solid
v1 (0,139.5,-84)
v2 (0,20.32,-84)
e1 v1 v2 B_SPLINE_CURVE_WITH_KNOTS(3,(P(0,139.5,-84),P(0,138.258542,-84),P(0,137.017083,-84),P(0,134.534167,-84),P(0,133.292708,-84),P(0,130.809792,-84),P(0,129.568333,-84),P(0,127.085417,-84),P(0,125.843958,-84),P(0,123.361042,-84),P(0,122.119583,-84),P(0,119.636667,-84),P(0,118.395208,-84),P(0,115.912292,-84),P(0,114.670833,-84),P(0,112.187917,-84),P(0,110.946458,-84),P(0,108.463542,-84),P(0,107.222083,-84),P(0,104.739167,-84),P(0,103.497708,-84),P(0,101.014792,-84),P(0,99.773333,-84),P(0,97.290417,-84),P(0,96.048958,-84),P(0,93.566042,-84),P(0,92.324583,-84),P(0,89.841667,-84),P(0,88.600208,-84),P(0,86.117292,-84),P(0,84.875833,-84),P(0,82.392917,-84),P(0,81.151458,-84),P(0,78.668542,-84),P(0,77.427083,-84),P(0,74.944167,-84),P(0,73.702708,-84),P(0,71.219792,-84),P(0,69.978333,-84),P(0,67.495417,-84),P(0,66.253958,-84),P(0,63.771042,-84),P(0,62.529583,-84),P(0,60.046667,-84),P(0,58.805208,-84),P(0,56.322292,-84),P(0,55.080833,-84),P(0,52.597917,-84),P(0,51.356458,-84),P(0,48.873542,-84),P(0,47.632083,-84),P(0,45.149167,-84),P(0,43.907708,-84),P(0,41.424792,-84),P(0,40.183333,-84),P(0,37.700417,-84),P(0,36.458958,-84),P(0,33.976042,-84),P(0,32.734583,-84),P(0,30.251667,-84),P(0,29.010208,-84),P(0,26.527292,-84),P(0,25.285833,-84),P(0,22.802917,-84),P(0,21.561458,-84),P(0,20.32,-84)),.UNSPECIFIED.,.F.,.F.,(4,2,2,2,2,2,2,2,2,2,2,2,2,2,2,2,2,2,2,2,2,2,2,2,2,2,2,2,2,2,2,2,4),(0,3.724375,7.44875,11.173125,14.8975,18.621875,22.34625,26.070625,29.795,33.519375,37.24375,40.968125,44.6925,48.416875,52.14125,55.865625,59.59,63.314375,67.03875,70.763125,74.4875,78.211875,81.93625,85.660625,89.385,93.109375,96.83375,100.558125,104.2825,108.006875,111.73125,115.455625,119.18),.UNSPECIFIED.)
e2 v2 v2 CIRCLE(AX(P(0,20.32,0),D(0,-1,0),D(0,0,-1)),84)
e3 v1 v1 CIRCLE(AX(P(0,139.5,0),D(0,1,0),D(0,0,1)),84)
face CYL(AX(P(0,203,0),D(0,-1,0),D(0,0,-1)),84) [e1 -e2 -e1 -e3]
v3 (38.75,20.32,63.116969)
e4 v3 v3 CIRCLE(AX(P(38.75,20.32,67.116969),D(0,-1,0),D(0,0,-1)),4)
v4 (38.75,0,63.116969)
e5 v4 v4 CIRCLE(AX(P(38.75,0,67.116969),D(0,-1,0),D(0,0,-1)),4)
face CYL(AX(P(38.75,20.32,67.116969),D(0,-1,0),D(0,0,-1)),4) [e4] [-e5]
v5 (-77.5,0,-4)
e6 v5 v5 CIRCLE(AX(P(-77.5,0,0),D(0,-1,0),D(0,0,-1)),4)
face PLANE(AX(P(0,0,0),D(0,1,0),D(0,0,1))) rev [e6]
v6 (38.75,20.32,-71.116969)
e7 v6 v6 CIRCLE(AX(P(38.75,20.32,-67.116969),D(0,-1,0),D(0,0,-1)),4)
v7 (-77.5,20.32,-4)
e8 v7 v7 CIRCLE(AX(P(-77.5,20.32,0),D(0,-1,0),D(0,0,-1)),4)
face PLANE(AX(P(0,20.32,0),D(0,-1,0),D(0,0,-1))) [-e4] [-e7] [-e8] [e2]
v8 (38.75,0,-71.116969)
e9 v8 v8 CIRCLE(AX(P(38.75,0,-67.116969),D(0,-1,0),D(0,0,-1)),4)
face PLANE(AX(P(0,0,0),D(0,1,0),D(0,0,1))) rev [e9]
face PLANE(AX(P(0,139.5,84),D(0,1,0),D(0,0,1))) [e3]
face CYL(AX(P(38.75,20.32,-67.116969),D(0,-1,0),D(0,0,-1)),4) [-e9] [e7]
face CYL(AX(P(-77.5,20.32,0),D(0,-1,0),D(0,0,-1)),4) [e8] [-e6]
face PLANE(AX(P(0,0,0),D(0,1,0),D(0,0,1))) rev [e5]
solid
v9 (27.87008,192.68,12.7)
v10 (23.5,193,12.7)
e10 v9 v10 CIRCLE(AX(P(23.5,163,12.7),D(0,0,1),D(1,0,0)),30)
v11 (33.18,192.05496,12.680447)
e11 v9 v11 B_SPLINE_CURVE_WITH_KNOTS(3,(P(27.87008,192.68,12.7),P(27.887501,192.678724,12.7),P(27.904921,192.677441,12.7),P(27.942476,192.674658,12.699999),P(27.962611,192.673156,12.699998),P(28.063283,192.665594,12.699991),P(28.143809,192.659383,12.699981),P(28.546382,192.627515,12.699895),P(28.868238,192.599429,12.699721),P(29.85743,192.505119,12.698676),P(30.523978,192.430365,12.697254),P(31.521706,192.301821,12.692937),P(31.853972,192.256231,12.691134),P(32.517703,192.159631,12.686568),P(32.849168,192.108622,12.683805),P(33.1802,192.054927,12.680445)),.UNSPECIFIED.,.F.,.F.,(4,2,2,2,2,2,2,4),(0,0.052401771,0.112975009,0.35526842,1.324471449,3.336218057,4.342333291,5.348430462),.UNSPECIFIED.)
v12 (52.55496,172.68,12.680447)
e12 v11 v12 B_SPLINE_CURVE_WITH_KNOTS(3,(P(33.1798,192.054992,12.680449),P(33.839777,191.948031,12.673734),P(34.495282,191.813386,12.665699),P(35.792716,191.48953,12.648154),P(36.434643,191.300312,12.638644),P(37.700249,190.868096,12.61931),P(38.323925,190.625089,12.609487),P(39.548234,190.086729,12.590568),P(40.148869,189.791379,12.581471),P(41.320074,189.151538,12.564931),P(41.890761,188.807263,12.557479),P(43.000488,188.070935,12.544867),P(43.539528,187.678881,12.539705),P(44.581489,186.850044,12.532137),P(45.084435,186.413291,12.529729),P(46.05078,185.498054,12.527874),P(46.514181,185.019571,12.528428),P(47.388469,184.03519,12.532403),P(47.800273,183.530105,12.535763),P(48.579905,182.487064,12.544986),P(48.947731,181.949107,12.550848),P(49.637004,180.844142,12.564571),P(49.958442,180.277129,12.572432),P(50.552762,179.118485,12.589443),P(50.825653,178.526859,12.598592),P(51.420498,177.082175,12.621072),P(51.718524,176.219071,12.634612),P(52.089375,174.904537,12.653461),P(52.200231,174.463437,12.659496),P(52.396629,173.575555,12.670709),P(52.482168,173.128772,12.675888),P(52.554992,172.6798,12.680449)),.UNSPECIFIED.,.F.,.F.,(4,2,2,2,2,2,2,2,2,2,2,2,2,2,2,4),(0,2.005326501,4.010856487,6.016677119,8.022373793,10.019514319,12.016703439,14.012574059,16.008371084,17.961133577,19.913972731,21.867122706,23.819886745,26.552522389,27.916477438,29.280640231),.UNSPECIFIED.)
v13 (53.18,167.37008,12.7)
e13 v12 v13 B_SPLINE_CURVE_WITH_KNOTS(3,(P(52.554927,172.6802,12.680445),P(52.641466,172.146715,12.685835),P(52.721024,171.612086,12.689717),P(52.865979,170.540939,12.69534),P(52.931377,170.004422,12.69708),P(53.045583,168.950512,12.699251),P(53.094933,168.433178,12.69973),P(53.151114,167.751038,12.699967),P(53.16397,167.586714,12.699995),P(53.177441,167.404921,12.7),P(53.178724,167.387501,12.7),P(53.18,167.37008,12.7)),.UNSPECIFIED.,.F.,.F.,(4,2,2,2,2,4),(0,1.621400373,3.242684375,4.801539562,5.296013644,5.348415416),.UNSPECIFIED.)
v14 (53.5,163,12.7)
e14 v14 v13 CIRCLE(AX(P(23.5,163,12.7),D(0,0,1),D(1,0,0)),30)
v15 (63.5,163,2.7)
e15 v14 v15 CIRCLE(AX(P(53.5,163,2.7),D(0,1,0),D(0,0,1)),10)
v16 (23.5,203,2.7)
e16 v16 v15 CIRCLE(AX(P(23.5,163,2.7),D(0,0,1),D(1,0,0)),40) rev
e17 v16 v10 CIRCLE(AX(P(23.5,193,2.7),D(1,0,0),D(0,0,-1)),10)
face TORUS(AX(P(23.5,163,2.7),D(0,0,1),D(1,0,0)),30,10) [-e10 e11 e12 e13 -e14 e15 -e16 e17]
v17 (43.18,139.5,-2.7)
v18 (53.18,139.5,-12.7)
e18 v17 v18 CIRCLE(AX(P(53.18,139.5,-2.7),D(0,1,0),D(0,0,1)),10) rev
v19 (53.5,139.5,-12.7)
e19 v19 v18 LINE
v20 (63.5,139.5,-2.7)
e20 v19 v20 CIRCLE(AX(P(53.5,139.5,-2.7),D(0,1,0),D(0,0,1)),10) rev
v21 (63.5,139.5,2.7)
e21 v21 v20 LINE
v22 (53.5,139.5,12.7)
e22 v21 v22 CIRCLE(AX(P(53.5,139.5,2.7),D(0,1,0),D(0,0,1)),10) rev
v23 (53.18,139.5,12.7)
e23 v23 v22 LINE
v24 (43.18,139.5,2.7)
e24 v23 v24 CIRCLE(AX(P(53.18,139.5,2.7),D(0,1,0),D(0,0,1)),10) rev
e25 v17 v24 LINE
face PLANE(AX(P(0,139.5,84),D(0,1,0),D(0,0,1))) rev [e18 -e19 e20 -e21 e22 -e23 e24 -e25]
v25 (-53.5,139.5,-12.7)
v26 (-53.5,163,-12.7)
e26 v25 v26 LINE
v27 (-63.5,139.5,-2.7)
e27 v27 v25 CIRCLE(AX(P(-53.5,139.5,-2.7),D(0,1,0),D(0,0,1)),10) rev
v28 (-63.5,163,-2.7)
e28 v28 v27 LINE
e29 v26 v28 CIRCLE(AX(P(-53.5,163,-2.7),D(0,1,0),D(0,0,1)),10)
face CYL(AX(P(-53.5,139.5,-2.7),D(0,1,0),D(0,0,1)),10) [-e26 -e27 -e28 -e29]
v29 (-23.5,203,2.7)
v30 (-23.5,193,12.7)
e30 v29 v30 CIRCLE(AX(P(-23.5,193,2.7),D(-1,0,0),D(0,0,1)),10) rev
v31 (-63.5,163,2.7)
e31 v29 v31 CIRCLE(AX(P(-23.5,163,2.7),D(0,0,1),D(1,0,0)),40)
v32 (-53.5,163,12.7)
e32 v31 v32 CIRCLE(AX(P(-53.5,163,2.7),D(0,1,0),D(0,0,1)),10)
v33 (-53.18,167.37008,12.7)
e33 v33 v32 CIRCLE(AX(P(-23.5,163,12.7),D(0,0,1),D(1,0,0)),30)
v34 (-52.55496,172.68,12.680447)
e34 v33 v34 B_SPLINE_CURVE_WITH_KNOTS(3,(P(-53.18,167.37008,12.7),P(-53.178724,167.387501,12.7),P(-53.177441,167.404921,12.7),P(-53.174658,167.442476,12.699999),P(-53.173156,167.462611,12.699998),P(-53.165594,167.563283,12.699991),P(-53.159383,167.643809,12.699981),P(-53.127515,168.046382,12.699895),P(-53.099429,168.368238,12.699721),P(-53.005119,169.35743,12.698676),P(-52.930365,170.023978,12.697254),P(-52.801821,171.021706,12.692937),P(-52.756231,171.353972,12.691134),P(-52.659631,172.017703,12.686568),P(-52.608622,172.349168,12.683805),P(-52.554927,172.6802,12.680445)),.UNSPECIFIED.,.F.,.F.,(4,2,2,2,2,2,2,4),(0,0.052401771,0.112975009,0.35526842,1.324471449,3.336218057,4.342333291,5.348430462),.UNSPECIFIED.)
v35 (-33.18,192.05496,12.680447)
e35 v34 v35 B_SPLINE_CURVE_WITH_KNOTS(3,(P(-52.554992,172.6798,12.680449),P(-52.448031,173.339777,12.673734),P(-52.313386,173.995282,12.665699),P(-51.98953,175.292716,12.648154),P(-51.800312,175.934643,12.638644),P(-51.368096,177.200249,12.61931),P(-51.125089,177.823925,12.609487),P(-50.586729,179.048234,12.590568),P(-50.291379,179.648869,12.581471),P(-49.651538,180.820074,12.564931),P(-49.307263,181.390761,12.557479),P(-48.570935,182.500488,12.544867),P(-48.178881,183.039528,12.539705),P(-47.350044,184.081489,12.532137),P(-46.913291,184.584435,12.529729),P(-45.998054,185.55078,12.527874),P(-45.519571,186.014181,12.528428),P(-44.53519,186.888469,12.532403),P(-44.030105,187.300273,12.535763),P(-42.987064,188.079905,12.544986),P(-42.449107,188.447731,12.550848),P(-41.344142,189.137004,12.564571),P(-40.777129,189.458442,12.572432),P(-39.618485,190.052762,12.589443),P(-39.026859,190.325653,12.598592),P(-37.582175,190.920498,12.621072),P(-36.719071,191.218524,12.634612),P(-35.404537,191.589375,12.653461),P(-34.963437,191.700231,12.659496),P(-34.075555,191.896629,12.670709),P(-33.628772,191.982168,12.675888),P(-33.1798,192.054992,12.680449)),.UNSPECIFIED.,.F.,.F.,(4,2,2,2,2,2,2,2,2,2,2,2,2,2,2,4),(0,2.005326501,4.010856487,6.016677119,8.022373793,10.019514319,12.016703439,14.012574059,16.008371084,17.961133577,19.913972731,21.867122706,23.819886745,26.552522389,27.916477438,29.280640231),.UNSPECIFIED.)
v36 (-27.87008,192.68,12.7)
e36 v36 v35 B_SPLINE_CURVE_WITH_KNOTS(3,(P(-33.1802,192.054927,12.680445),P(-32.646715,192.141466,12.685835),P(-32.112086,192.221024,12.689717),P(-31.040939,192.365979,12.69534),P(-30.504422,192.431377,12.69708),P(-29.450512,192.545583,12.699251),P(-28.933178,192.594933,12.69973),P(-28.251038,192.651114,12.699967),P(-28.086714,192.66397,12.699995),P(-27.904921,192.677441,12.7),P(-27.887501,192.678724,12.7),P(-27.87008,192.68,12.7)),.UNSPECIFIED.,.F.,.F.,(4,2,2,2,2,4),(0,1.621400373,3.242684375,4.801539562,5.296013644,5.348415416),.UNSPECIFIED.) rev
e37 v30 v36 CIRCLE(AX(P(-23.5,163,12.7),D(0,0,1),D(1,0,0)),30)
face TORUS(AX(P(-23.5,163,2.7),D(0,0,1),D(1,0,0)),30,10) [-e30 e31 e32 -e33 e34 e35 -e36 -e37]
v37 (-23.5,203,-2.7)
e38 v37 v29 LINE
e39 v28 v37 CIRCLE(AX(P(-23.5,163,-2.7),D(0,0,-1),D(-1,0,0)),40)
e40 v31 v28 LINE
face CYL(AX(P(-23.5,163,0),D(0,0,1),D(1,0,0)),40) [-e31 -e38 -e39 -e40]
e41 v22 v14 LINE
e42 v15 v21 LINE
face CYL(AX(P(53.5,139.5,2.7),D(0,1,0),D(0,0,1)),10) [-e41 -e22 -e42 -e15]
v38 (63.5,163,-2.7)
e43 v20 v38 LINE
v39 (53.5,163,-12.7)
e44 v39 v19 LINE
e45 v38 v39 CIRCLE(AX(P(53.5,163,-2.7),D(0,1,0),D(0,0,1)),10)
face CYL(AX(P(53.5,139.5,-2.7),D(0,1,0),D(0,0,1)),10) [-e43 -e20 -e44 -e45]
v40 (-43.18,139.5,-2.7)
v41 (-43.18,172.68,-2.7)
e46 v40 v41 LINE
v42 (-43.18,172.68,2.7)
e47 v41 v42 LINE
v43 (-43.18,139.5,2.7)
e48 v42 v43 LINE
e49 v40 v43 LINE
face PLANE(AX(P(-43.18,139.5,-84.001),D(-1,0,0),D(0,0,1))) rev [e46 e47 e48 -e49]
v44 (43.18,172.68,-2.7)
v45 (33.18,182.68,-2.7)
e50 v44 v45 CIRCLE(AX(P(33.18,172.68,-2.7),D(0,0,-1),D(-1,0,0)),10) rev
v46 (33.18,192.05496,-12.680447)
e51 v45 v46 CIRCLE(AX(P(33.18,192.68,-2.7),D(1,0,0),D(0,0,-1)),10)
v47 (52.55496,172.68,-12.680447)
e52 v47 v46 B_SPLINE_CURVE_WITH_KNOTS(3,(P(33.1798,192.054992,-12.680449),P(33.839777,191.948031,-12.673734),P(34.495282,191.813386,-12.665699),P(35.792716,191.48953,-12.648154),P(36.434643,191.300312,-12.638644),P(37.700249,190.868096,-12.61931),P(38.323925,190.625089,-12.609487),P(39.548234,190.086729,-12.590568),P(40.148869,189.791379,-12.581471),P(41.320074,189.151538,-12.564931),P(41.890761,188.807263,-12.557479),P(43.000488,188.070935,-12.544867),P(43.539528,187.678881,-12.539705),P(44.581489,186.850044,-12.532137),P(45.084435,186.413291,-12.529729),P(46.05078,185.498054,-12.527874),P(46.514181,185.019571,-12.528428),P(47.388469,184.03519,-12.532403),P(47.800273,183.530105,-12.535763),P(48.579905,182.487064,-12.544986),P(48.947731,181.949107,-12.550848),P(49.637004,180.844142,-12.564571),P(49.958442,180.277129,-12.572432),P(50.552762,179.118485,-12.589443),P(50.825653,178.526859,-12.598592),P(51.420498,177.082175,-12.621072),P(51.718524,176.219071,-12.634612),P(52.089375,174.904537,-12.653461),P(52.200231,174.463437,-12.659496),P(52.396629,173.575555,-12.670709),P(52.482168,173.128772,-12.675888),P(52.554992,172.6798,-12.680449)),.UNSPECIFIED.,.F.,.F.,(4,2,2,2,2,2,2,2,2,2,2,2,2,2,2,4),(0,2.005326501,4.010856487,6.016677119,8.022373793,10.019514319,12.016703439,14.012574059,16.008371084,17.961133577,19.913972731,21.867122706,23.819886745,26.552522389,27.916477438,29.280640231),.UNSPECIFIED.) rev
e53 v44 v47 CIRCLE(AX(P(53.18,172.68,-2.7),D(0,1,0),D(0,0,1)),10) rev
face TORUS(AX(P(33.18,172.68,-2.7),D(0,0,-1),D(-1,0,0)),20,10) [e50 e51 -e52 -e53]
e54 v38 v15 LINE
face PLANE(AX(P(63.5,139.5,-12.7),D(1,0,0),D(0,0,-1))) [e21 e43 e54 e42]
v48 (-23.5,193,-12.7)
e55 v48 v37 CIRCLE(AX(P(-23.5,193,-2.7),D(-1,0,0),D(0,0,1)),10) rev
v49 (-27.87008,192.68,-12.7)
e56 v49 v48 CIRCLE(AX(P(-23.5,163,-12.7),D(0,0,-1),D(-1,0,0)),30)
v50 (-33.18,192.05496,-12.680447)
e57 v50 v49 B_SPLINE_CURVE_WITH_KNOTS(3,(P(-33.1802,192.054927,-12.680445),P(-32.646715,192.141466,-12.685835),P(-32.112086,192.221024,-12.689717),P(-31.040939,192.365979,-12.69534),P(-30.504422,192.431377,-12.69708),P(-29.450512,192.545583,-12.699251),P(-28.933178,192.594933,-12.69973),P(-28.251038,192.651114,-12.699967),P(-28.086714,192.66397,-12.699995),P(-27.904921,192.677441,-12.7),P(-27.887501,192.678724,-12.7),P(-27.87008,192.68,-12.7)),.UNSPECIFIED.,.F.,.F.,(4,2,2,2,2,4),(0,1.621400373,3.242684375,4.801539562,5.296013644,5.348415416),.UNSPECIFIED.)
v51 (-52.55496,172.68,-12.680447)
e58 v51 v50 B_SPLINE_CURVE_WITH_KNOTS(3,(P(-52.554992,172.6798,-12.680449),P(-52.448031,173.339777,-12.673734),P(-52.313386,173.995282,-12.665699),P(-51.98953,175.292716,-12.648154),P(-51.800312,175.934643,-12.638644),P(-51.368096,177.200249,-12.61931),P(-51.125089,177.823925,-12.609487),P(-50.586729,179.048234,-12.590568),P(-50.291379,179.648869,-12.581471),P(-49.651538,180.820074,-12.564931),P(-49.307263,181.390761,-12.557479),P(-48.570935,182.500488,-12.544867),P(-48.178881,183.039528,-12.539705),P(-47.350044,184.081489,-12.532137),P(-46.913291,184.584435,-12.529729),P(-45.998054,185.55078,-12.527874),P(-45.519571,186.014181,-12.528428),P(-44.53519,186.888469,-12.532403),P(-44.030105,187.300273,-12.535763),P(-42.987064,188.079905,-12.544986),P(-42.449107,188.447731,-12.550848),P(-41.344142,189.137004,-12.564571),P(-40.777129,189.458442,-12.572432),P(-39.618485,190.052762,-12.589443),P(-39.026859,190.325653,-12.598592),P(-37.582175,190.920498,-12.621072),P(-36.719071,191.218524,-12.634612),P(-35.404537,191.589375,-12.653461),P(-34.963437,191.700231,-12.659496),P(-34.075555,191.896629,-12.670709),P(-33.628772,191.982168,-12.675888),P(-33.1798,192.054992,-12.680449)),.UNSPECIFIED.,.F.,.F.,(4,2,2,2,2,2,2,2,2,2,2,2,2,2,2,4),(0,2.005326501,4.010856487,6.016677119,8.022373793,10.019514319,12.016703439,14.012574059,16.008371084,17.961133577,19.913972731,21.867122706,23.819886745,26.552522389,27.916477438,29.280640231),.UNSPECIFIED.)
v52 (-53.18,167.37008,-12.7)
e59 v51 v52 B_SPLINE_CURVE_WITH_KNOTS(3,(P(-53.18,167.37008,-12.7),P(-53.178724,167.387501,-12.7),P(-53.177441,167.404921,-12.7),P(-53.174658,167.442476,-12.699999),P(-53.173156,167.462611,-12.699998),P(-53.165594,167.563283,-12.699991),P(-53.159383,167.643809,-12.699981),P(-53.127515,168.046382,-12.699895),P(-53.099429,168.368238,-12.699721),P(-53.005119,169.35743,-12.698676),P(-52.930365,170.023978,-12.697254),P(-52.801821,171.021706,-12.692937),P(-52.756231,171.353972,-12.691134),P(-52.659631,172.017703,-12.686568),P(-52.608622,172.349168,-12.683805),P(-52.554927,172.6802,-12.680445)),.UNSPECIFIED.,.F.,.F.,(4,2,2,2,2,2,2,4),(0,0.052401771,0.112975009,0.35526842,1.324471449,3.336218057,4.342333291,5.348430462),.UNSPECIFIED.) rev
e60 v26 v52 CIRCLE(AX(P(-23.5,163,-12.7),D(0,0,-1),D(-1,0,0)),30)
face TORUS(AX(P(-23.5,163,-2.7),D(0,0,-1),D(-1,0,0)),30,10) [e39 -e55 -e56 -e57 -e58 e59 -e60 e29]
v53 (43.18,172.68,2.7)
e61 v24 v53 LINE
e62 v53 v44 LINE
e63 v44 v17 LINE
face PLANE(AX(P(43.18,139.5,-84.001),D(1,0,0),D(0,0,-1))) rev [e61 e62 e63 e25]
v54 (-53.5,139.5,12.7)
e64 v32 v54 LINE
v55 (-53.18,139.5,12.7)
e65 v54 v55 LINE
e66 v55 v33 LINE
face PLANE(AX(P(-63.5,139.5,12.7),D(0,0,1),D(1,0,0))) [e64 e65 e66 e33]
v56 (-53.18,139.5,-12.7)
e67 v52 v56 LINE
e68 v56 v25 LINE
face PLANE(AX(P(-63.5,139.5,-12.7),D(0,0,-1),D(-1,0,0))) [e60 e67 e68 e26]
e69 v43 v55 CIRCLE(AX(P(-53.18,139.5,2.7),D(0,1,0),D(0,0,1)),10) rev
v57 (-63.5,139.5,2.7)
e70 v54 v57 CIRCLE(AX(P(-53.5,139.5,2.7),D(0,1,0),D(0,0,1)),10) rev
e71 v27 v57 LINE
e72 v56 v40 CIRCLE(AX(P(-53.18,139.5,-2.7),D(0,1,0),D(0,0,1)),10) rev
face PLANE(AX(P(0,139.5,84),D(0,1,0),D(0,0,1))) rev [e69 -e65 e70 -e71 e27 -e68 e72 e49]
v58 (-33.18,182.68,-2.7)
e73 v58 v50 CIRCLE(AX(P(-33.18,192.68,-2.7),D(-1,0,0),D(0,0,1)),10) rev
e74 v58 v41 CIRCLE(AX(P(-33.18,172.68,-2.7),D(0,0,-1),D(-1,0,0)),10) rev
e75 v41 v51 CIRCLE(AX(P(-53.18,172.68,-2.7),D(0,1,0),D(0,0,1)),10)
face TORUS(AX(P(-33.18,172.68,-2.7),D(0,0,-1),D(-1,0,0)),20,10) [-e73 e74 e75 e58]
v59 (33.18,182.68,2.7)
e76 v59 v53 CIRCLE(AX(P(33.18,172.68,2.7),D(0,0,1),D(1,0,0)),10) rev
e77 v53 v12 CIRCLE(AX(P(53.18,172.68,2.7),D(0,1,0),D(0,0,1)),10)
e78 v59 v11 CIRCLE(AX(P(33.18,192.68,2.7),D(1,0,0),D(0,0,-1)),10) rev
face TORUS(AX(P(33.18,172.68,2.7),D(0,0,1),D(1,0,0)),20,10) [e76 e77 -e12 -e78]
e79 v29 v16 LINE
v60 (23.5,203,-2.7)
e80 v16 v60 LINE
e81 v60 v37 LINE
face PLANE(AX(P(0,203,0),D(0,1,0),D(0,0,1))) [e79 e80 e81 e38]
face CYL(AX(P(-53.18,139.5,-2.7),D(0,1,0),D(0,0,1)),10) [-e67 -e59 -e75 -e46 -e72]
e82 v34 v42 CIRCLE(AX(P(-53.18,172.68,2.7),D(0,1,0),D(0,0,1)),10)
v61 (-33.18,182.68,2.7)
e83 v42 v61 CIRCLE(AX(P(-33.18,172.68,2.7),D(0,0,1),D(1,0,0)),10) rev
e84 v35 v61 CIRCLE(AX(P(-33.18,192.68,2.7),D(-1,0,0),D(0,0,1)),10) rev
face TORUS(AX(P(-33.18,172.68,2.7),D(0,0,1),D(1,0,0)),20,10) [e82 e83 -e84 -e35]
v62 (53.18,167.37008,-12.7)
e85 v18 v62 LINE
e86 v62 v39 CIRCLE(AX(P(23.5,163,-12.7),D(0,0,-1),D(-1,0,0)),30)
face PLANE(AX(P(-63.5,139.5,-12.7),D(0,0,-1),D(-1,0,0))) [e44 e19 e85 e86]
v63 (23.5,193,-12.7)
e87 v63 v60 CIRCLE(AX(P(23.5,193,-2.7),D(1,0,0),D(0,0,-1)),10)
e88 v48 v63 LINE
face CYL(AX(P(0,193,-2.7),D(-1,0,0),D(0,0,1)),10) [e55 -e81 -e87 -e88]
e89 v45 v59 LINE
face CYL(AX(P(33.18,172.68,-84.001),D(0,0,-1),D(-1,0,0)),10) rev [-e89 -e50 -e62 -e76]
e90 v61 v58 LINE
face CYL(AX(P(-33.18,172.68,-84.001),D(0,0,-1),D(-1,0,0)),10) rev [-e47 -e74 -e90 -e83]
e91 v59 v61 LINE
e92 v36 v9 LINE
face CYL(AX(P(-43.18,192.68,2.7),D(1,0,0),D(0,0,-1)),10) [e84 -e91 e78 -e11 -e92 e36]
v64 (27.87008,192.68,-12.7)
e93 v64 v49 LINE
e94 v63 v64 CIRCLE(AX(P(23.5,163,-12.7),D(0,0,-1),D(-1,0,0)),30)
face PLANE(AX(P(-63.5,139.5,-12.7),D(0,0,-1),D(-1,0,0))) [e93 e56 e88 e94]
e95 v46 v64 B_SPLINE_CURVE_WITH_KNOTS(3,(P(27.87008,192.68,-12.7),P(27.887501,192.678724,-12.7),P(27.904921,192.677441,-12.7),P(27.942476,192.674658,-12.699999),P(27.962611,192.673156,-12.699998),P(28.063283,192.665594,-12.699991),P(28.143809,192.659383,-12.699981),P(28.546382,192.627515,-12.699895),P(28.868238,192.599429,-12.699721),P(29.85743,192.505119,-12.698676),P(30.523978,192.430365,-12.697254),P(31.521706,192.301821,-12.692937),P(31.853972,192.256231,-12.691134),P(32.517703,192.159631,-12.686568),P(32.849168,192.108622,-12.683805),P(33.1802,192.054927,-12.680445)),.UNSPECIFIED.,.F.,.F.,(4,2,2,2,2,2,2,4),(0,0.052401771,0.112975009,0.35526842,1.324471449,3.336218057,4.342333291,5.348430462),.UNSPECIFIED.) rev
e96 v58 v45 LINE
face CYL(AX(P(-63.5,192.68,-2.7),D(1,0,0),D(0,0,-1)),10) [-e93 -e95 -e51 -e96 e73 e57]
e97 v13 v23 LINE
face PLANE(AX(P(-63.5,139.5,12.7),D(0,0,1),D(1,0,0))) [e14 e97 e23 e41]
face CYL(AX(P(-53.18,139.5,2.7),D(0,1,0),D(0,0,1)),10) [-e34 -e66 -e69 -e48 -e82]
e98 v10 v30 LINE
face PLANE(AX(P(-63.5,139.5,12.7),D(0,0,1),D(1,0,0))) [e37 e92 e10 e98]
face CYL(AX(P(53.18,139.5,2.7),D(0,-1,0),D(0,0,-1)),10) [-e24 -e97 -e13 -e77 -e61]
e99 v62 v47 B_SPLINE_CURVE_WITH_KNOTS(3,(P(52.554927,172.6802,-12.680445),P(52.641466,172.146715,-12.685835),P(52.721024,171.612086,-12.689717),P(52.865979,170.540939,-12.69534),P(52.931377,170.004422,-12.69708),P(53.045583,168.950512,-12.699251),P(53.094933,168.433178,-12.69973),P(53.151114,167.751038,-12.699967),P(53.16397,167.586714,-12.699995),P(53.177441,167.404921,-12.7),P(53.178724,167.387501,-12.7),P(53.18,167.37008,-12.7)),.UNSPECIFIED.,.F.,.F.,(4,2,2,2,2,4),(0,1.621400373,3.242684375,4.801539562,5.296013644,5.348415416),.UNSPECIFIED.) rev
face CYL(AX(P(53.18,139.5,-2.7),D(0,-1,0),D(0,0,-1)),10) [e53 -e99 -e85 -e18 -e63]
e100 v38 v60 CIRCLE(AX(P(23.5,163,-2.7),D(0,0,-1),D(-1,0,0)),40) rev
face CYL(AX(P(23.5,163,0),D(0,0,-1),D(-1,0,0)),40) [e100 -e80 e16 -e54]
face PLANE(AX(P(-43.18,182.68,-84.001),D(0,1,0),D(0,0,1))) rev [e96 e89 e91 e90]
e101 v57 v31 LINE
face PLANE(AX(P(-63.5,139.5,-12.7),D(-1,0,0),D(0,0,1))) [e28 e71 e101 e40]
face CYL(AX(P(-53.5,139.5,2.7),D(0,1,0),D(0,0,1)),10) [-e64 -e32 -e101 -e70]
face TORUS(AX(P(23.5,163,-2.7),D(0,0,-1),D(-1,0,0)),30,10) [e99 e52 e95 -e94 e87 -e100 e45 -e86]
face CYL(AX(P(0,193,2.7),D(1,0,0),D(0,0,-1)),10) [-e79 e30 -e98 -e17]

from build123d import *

# Parameters (mm, degrees)
SKETCH1_R           = 84
BOSS_EXTRUDE1_DEPTH = 203
SKETCH2_OUTSIDE_W   = 232.5
SKETCH2_OUTSIDE_H   = 232.5
SKETCH2_OUTSIDE_W_2 = 127
SKETCH2_OUTSIDE_H_2 = 25.4
CUT_EXTRUDE1_DEPTH  = 63.5
CUT_EXTRUDE2_REACH  = 242.033
SKETCH3_W           = 86.36
SKETCH3_H           = 43.18
FILLET1_R           = 10
FILLET1_R_2         = 40
SKETCH4_OUTSIDE_W   = 232.5
SKETCH4_OUTSIDE_H   = 232.5
SKETCH4_OUTSIDE_R   = 4
CUT_EXTRUDE3_DEPTH  = 20.32
SPLIT1_START        = 20.32
SPLIT1_OUTLINE_R    = 84
SPLIT1_DEPTH        = 119.18
SPLIT1_2_OUTLINE_R  = 4
SPLIT1_2_DEPTH      = 20.32
SPLIT1_3_OUTLINE_R  = 84
SPLIT1_3_DEPTH      = 139.5


# Read off the part's stored shape, not the designer's step: Split1
with BuildPart() as part:
    # Sketch1 → Boss-Extrude1 (new body)
    with BuildSketch(Plane(origin=(0, 0, 0), x_dir=(1, 0, 0), z_dir=(0, 1, 0))):
        with Locations(Location((0, 0, 0), (0, 0, 90))):
            Circle(SKETCH1_R)
    extrude(amount=BOSS_EXTRUDE1_DEPTH)

    # Sketch2 outside → Cut-Extrude1 (cut)
    with BuildSketch(Plane(origin=(0, 203, 0), x_dir=(1, 0, 0), z_dir=(0, 1, 0))):
        Rectangle(SKETCH2_OUTSIDE_W, SKETCH2_OUTSIDE_H)
        Rectangle(SKETCH2_OUTSIDE_W_2, SKETCH2_OUTSIDE_H_2, mode=Mode.SUBTRACT)
    extrude(amount=-CUT_EXTRUDE1_DEPTH, mode=Mode.SUBTRACT)

    # Sketch3 → Cut-Extrude2 (cut, up to next)
    with BuildSketch(Plane.XY.offset(12.7), mode=Mode.PRIVATE) as cut_extrude2_sk1:
        with Locations((0, 161.09)):
            Rectangle(SKETCH3_W, SKETCH3_H)
    cut_extrude2_tool1 = extrude(cut_extrude2_sk1.sketch, amount=-CUT_EXTRUDE2_REACH, mode=Mode.PRIVATE) & part.part
    add(cut_extrude2_tool1.solids().sort_by_distance((0, 161.09, 12.7))[0], mode=Mode.SUBTRACT)

    # Fillet1
    # the kernel refuses this fillet: 40, 10 mm, written as the material it adds along each edge
    with BuildSketch(Plane(origin=(-43.18, 182.68, 12.7), x_dir=(1, 0, 0), z_dir=(0, 0, -1)), Plane(origin=(43.18, 182.68, 12.7), x_dir=(0, -1, 0), z_dir=(0, 0, -1))) as fillet1_piece_1:
        with BuildLine():
            CenterArc((FILLET1_R, FILLET1_R), FILLET1_R, 180, 90)
            Line((0, FILLET1_R), (0, 0))
            Line((0, 0), (FILLET1_R, 0))
        make_face()
    extrude(amount=25.4)
    # the kernel refuses this fillet: 40, 10 mm, written as the material it takes off along each edge
    with BuildSketch(Plane(origin=(-63.5, 203, 112.7), x_dir=(0, -1, 0), z_dir=(0, 0, -1)), Plane(origin=(63.5, 203, -112.7), x_dir=(0, -1, 0), z_dir=(0, 0, 1))) as fillet1_2_piece_1:
        with BuildLine():
            CenterArc((FILLET1_R_2, -FILLET1_R_2), FILLET1_R_2, 90, 90)
            Line((0, -FILLET1_R_2), (0, 0))
            Line((0, 0), (FILLET1_R_2, 0))
        make_face()
    extrude(amount=225.4, mode=Mode.SUBTRACT)
    # the kernel refuses this fillet: 40, 10 mm, written as the material it takes off along each edge
    with BuildSketch(Plane(origin=(-43.18, 139.5, -12.7), x_dir=(-1, 0, 0), z_dir=(0, 1, 0)), Plane(origin=(43.18, 139.5, 12.7), x_dir=(1, 0, 0), z_dir=(0, 1, 0)), Plane(origin=(43.18, 172.68, -12.7), x_dir=(1, 0, 0), z_dir=(0, -1, 0))) as fillet1_3_piece_1:
        with BuildLine():
            CenterArc((FILLET1_R, FILLET1_R), FILLET1_R, 180, 90)
            Line((0, FILLET1_R), (0, 0))
            Line((0, 0), (FILLET1_R, 0))
        make_face()
    extrude(amount=33.18, mode=Mode.SUBTRACT)
    with BuildSketch(Plane(origin=(-63.5, 163, -12.7), x_dir=(1, 0, 0), z_dir=(0, -1, 0)), Plane(origin=(63.5, 163, 12.7), x_dir=(-1, 0, 0), z_dir=(0, -1, 0))) as fillet1_3_piece_2:
        with BuildLine():
            CenterArc((FILLET1_R, FILLET1_R), FILLET1_R, 180, 90)
            Line((0, FILLET1_R), (0, 0))
            Line((0, 0), (FILLET1_R, 0))
        make_face()
    extrude(amount=23.5, mode=Mode.SUBTRACT)
    with BuildSketch(Plane(origin=(-43.18, 172.68, 12.7), x_dir=(0, 0, -1), z_dir=(0, -1, 0))) as fillet1_3_piece_3:
        with BuildLine():
            CenterArc((FILLET1_R, -FILLET1_R), FILLET1_R, 90, 90)
            Line((0, -FILLET1_R), (0, 0))
            Line((0, 0), (FILLET1_R, 0))
        make_face()
    extrude(amount=33.18, mode=Mode.SUBTRACT)
    with BuildSketch(Plane(origin=(-63.5, 163, 12.7), x_dir=(1, 0, 0), z_dir=(0, -1, 0)), Plane(origin=(63.5, 163, -12.7), x_dir=(-1, 0, 0), z_dir=(0, -1, 0))) as fillet1_3_piece_4:
        with BuildLine():
            CenterArc((FILLET1_R, -FILLET1_R), FILLET1_R, 90, 90)
            Line((0, -FILLET1_R), (0, 0))
            Line((0, 0), (FILLET1_R, 0))
        make_face()
    extrude(amount=23.5, mode=Mode.SUBTRACT)
    with BuildSketch(Plane(origin=(33.18, 182.68, 12.7), x_dir=(0, 1, 0), z_dir=(-1, 0, 0)), Plane(origin=(-33.18, 182.68, -12.7), x_dir=(0, 1, 0), z_dir=(1, 0, 0))) as fillet1_3_piece_5:
        with BuildLine():
            CenterArc((FILLET1_R, FILLET1_R), FILLET1_R, 180, 90)
            Line((0, FILLET1_R), (0, 0))
            Line((0, 0), (FILLET1_R, 0))
        make_face()
    extrude(amount=66.36, mode=Mode.SUBTRACT)
    with BuildSketch(Plane(origin=(23.5, 203, 12.7), x_dir=(0, -1, 0), z_dir=(-1, 0, 0)), Plane(origin=(-23.5, 203, -12.7), x_dir=(0, -1, 0), z_dir=(1, 0, 0))) as fillet1_3_piece_6:
        with BuildLine():
            CenterArc((FILLET1_R, -FILLET1_R), FILLET1_R, 90, 90)
            Line((0, -FILLET1_R), (0, 0))
            Line((0, 0), (FILLET1_R, 0))
        make_face()
    extrude(amount=47, mode=Mode.SUBTRACT)
    with BuildSketch(Plane(origin=(23.5, 163, -12.7), x_dir=(0, 1, 0), z_dir=(-1, 0, 0))) as fillet1_3_piece_7:
        with BuildLine():
            CenterArc((40 - FILLET1_R, -FILLET1_R), FILLET1_R, 0, 90)
            Line((40, -FILLET1_R), (40, 0))
            Line((40, 0), (40 - FILLET1_R, 0))
        make_face()
    revolve(axis=Axis((23.5, 163, -12.7), (0, 0, -1)), revolution_arc=90, mode=Mode.SUBTRACT)
    with BuildSketch(Plane(origin=(23.5, 163, 12.7), x_dir=(0, 1, 0), z_dir=(-1, 0, 0))) as fillet1_3_piece_8:
        with BuildLine():
            CenterArc((40 - FILLET1_R, FILLET1_R), FILLET1_R, 270, 90)
            Line((40, FILLET1_R), (40, 0))
            Line((40, 0), (40 - FILLET1_R, 0))
        make_face()
    revolve(axis=Axis((23.5, 163, 12.7), (0, 0, -1)), revolution_arc=90, mode=Mode.SUBTRACT)
    with BuildSketch(Plane(origin=(33.18, 172.68, -12.7), x_dir=(1, 0, 0), z_dir=(0, -1, 0))) as fillet1_3_piece_9:
        with BuildLine():
            CenterArc((10 + FILLET1_R, FILLET1_R), FILLET1_R, 180, 90)
            Line((10, FILLET1_R), (10, 0))
            Line((10, 0), (10 + FILLET1_R, 0))
        make_face()
    revolve(axis=Axis((33.18, 172.68, -12.7), (0, 0, 1)), revolution_arc=90, mode=Mode.SUBTRACT)
    with BuildSketch(Plane(origin=(33.18, 172.68, 12.7), x_dir=(1, 0, 0), z_dir=(0, -1, 0))) as fillet1_3_piece_10:
        with BuildLine():
            CenterArc((10 + FILLET1_R, -FILLET1_R), FILLET1_R, 90, 90)
            Line((10, -FILLET1_R), (10, 0))
            Line((10, 0), (10 + FILLET1_R, 0))
        make_face()
    revolve(axis=Axis((33.18, 172.68, 12.7), (0, 0, 1)), revolution_arc=90, mode=Mode.SUBTRACT)
    with BuildSketch(Plane(origin=(-33.18, 172.68, -12.7), x_dir=(0, 1, 0), z_dir=(1, 0, 0))) as fillet1_3_piece_11:
        with BuildLine():
            CenterArc((10 + FILLET1_R, FILLET1_R), FILLET1_R, 180, 90)
            Line((10, FILLET1_R), (10, 0))
            Line((10, 0), (10 + FILLET1_R, 0))
        make_face()
    revolve(axis=Axis((-33.18, 172.68, -12.7), (0, 0, 1)), revolution_arc=90, mode=Mode.SUBTRACT)
    with BuildSketch(Plane(origin=(-23.5, 163, -12.7), x_dir=(0, 1, 0), z_dir=(1, 0, 0))) as fillet1_3_piece_12:
        with BuildLine():
            CenterArc((40 - FILLET1_R, FILLET1_R), FILLET1_R, 270, 90)
            Line((40, FILLET1_R), (40, 0))
            Line((40, 0), (40 - FILLET1_R, 0))
        make_face()
    revolve(axis=Axis((-23.5, 163, -12.7), (0, 0, 1)), revolution_arc=90, mode=Mode.SUBTRACT)
    with BuildSketch(Plane(origin=(-23.5, 163, 12.7), x_dir=(0, 1, 0), z_dir=(1, 0, 0))) as fillet1_3_piece_13:
        with BuildLine():
            CenterArc((40 - FILLET1_R, -FILLET1_R), FILLET1_R, 0, 90)
            Line((40, -FILLET1_R), (40, 0))
            Line((40, 0), (40 - FILLET1_R, 0))
        make_face()
    revolve(axis=Axis((-23.5, 163, 12.7), (0, 0, 1)), revolution_arc=90, mode=Mode.SUBTRACT)
    with BuildSketch(Plane(origin=(-33.18, 172.68, 12.7), x_dir=(0, 1, 0), z_dir=(1, 0, 0))) as fillet1_3_piece_14:
        with BuildLine():
            CenterArc((10 + FILLET1_R, -FILLET1_R), FILLET1_R, 90, 90)
            Line((10, -FILLET1_R), (10, 0))
            Line((10, 0), (10 + FILLET1_R, 0))
        make_face()
    revolve(axis=Axis((-33.18, 172.68, 12.7), (0, 0, 1)), revolution_arc=90, mode=Mode.SUBTRACT)

    # Sketch4 outside → Cut-Extrude3 (cut)
    with BuildSketch(Plane.XZ):
        Rectangle(SKETCH4_OUTSIDE_W, SKETCH4_OUTSIDE_H)
        with Locations(Location((-77.5, 0, 0), (0, 0, 270))):
            Circle(SKETCH4_OUTSIDE_R, mode=Mode.SUBTRACT)
        with Locations(Location((38.75, 67.116968793, 0), (0, 0, 270))):
            Circle(SKETCH4_OUTSIDE_R, mode=Mode.SUBTRACT)
        with Locations(Location((38.75, -67.116968793, 0), (0, 0, 270))):
            Circle(SKETCH4_OUTSIDE_R, mode=Mode.SUBTRACT)
    extrude(amount=-CUT_EXTRUDE3_DEPTH, mode=Mode.SUBTRACT)

    # Split1 3 outline → Split1 3 (cut)
    with BuildSketch(Plane(origin=(0, 0, 0), x_dir=(1, 0, 0), z_dir=(0, 1, 0))):
        Circle(SPLIT1_3_OUTLINE_R)
    extrude(amount=SPLIT1_3_DEPTH, mode=Mode.SUBTRACT)


with BuildPart() as body_2:
    # Split1 outline → Split1 (new body)
    with BuildSketch(Plane(origin=(0, 0, 0), x_dir=(1, 0, 0), z_dir=(0, 1, 0)).offset(SPLIT1_START)):
        Circle(SPLIT1_OUTLINE_R)
    extrude(amount=SPLIT1_DEPTH)

    # Split1 2 outline → Split1 2 (add)
    with BuildSketch(Plane(origin=(0, 0, 0), x_dir=(1, 0, 0), z_dir=(0, 1, 0))):
        with Locations((-77.5, 0)):
            Circle(SPLIT1_2_OUTLINE_R)
        with Locations((38.75, -67.116968793)):
            Circle(SPLIT1_2_OUTLINE_R)
        with Locations((38.75, 67.116968793)):
            Circle(SPLIT1_2_OUTLINE_R)
    extrude(amount=SPLIT1_2_DEPTH)


solid = Compound([part.part, body_2.part])
